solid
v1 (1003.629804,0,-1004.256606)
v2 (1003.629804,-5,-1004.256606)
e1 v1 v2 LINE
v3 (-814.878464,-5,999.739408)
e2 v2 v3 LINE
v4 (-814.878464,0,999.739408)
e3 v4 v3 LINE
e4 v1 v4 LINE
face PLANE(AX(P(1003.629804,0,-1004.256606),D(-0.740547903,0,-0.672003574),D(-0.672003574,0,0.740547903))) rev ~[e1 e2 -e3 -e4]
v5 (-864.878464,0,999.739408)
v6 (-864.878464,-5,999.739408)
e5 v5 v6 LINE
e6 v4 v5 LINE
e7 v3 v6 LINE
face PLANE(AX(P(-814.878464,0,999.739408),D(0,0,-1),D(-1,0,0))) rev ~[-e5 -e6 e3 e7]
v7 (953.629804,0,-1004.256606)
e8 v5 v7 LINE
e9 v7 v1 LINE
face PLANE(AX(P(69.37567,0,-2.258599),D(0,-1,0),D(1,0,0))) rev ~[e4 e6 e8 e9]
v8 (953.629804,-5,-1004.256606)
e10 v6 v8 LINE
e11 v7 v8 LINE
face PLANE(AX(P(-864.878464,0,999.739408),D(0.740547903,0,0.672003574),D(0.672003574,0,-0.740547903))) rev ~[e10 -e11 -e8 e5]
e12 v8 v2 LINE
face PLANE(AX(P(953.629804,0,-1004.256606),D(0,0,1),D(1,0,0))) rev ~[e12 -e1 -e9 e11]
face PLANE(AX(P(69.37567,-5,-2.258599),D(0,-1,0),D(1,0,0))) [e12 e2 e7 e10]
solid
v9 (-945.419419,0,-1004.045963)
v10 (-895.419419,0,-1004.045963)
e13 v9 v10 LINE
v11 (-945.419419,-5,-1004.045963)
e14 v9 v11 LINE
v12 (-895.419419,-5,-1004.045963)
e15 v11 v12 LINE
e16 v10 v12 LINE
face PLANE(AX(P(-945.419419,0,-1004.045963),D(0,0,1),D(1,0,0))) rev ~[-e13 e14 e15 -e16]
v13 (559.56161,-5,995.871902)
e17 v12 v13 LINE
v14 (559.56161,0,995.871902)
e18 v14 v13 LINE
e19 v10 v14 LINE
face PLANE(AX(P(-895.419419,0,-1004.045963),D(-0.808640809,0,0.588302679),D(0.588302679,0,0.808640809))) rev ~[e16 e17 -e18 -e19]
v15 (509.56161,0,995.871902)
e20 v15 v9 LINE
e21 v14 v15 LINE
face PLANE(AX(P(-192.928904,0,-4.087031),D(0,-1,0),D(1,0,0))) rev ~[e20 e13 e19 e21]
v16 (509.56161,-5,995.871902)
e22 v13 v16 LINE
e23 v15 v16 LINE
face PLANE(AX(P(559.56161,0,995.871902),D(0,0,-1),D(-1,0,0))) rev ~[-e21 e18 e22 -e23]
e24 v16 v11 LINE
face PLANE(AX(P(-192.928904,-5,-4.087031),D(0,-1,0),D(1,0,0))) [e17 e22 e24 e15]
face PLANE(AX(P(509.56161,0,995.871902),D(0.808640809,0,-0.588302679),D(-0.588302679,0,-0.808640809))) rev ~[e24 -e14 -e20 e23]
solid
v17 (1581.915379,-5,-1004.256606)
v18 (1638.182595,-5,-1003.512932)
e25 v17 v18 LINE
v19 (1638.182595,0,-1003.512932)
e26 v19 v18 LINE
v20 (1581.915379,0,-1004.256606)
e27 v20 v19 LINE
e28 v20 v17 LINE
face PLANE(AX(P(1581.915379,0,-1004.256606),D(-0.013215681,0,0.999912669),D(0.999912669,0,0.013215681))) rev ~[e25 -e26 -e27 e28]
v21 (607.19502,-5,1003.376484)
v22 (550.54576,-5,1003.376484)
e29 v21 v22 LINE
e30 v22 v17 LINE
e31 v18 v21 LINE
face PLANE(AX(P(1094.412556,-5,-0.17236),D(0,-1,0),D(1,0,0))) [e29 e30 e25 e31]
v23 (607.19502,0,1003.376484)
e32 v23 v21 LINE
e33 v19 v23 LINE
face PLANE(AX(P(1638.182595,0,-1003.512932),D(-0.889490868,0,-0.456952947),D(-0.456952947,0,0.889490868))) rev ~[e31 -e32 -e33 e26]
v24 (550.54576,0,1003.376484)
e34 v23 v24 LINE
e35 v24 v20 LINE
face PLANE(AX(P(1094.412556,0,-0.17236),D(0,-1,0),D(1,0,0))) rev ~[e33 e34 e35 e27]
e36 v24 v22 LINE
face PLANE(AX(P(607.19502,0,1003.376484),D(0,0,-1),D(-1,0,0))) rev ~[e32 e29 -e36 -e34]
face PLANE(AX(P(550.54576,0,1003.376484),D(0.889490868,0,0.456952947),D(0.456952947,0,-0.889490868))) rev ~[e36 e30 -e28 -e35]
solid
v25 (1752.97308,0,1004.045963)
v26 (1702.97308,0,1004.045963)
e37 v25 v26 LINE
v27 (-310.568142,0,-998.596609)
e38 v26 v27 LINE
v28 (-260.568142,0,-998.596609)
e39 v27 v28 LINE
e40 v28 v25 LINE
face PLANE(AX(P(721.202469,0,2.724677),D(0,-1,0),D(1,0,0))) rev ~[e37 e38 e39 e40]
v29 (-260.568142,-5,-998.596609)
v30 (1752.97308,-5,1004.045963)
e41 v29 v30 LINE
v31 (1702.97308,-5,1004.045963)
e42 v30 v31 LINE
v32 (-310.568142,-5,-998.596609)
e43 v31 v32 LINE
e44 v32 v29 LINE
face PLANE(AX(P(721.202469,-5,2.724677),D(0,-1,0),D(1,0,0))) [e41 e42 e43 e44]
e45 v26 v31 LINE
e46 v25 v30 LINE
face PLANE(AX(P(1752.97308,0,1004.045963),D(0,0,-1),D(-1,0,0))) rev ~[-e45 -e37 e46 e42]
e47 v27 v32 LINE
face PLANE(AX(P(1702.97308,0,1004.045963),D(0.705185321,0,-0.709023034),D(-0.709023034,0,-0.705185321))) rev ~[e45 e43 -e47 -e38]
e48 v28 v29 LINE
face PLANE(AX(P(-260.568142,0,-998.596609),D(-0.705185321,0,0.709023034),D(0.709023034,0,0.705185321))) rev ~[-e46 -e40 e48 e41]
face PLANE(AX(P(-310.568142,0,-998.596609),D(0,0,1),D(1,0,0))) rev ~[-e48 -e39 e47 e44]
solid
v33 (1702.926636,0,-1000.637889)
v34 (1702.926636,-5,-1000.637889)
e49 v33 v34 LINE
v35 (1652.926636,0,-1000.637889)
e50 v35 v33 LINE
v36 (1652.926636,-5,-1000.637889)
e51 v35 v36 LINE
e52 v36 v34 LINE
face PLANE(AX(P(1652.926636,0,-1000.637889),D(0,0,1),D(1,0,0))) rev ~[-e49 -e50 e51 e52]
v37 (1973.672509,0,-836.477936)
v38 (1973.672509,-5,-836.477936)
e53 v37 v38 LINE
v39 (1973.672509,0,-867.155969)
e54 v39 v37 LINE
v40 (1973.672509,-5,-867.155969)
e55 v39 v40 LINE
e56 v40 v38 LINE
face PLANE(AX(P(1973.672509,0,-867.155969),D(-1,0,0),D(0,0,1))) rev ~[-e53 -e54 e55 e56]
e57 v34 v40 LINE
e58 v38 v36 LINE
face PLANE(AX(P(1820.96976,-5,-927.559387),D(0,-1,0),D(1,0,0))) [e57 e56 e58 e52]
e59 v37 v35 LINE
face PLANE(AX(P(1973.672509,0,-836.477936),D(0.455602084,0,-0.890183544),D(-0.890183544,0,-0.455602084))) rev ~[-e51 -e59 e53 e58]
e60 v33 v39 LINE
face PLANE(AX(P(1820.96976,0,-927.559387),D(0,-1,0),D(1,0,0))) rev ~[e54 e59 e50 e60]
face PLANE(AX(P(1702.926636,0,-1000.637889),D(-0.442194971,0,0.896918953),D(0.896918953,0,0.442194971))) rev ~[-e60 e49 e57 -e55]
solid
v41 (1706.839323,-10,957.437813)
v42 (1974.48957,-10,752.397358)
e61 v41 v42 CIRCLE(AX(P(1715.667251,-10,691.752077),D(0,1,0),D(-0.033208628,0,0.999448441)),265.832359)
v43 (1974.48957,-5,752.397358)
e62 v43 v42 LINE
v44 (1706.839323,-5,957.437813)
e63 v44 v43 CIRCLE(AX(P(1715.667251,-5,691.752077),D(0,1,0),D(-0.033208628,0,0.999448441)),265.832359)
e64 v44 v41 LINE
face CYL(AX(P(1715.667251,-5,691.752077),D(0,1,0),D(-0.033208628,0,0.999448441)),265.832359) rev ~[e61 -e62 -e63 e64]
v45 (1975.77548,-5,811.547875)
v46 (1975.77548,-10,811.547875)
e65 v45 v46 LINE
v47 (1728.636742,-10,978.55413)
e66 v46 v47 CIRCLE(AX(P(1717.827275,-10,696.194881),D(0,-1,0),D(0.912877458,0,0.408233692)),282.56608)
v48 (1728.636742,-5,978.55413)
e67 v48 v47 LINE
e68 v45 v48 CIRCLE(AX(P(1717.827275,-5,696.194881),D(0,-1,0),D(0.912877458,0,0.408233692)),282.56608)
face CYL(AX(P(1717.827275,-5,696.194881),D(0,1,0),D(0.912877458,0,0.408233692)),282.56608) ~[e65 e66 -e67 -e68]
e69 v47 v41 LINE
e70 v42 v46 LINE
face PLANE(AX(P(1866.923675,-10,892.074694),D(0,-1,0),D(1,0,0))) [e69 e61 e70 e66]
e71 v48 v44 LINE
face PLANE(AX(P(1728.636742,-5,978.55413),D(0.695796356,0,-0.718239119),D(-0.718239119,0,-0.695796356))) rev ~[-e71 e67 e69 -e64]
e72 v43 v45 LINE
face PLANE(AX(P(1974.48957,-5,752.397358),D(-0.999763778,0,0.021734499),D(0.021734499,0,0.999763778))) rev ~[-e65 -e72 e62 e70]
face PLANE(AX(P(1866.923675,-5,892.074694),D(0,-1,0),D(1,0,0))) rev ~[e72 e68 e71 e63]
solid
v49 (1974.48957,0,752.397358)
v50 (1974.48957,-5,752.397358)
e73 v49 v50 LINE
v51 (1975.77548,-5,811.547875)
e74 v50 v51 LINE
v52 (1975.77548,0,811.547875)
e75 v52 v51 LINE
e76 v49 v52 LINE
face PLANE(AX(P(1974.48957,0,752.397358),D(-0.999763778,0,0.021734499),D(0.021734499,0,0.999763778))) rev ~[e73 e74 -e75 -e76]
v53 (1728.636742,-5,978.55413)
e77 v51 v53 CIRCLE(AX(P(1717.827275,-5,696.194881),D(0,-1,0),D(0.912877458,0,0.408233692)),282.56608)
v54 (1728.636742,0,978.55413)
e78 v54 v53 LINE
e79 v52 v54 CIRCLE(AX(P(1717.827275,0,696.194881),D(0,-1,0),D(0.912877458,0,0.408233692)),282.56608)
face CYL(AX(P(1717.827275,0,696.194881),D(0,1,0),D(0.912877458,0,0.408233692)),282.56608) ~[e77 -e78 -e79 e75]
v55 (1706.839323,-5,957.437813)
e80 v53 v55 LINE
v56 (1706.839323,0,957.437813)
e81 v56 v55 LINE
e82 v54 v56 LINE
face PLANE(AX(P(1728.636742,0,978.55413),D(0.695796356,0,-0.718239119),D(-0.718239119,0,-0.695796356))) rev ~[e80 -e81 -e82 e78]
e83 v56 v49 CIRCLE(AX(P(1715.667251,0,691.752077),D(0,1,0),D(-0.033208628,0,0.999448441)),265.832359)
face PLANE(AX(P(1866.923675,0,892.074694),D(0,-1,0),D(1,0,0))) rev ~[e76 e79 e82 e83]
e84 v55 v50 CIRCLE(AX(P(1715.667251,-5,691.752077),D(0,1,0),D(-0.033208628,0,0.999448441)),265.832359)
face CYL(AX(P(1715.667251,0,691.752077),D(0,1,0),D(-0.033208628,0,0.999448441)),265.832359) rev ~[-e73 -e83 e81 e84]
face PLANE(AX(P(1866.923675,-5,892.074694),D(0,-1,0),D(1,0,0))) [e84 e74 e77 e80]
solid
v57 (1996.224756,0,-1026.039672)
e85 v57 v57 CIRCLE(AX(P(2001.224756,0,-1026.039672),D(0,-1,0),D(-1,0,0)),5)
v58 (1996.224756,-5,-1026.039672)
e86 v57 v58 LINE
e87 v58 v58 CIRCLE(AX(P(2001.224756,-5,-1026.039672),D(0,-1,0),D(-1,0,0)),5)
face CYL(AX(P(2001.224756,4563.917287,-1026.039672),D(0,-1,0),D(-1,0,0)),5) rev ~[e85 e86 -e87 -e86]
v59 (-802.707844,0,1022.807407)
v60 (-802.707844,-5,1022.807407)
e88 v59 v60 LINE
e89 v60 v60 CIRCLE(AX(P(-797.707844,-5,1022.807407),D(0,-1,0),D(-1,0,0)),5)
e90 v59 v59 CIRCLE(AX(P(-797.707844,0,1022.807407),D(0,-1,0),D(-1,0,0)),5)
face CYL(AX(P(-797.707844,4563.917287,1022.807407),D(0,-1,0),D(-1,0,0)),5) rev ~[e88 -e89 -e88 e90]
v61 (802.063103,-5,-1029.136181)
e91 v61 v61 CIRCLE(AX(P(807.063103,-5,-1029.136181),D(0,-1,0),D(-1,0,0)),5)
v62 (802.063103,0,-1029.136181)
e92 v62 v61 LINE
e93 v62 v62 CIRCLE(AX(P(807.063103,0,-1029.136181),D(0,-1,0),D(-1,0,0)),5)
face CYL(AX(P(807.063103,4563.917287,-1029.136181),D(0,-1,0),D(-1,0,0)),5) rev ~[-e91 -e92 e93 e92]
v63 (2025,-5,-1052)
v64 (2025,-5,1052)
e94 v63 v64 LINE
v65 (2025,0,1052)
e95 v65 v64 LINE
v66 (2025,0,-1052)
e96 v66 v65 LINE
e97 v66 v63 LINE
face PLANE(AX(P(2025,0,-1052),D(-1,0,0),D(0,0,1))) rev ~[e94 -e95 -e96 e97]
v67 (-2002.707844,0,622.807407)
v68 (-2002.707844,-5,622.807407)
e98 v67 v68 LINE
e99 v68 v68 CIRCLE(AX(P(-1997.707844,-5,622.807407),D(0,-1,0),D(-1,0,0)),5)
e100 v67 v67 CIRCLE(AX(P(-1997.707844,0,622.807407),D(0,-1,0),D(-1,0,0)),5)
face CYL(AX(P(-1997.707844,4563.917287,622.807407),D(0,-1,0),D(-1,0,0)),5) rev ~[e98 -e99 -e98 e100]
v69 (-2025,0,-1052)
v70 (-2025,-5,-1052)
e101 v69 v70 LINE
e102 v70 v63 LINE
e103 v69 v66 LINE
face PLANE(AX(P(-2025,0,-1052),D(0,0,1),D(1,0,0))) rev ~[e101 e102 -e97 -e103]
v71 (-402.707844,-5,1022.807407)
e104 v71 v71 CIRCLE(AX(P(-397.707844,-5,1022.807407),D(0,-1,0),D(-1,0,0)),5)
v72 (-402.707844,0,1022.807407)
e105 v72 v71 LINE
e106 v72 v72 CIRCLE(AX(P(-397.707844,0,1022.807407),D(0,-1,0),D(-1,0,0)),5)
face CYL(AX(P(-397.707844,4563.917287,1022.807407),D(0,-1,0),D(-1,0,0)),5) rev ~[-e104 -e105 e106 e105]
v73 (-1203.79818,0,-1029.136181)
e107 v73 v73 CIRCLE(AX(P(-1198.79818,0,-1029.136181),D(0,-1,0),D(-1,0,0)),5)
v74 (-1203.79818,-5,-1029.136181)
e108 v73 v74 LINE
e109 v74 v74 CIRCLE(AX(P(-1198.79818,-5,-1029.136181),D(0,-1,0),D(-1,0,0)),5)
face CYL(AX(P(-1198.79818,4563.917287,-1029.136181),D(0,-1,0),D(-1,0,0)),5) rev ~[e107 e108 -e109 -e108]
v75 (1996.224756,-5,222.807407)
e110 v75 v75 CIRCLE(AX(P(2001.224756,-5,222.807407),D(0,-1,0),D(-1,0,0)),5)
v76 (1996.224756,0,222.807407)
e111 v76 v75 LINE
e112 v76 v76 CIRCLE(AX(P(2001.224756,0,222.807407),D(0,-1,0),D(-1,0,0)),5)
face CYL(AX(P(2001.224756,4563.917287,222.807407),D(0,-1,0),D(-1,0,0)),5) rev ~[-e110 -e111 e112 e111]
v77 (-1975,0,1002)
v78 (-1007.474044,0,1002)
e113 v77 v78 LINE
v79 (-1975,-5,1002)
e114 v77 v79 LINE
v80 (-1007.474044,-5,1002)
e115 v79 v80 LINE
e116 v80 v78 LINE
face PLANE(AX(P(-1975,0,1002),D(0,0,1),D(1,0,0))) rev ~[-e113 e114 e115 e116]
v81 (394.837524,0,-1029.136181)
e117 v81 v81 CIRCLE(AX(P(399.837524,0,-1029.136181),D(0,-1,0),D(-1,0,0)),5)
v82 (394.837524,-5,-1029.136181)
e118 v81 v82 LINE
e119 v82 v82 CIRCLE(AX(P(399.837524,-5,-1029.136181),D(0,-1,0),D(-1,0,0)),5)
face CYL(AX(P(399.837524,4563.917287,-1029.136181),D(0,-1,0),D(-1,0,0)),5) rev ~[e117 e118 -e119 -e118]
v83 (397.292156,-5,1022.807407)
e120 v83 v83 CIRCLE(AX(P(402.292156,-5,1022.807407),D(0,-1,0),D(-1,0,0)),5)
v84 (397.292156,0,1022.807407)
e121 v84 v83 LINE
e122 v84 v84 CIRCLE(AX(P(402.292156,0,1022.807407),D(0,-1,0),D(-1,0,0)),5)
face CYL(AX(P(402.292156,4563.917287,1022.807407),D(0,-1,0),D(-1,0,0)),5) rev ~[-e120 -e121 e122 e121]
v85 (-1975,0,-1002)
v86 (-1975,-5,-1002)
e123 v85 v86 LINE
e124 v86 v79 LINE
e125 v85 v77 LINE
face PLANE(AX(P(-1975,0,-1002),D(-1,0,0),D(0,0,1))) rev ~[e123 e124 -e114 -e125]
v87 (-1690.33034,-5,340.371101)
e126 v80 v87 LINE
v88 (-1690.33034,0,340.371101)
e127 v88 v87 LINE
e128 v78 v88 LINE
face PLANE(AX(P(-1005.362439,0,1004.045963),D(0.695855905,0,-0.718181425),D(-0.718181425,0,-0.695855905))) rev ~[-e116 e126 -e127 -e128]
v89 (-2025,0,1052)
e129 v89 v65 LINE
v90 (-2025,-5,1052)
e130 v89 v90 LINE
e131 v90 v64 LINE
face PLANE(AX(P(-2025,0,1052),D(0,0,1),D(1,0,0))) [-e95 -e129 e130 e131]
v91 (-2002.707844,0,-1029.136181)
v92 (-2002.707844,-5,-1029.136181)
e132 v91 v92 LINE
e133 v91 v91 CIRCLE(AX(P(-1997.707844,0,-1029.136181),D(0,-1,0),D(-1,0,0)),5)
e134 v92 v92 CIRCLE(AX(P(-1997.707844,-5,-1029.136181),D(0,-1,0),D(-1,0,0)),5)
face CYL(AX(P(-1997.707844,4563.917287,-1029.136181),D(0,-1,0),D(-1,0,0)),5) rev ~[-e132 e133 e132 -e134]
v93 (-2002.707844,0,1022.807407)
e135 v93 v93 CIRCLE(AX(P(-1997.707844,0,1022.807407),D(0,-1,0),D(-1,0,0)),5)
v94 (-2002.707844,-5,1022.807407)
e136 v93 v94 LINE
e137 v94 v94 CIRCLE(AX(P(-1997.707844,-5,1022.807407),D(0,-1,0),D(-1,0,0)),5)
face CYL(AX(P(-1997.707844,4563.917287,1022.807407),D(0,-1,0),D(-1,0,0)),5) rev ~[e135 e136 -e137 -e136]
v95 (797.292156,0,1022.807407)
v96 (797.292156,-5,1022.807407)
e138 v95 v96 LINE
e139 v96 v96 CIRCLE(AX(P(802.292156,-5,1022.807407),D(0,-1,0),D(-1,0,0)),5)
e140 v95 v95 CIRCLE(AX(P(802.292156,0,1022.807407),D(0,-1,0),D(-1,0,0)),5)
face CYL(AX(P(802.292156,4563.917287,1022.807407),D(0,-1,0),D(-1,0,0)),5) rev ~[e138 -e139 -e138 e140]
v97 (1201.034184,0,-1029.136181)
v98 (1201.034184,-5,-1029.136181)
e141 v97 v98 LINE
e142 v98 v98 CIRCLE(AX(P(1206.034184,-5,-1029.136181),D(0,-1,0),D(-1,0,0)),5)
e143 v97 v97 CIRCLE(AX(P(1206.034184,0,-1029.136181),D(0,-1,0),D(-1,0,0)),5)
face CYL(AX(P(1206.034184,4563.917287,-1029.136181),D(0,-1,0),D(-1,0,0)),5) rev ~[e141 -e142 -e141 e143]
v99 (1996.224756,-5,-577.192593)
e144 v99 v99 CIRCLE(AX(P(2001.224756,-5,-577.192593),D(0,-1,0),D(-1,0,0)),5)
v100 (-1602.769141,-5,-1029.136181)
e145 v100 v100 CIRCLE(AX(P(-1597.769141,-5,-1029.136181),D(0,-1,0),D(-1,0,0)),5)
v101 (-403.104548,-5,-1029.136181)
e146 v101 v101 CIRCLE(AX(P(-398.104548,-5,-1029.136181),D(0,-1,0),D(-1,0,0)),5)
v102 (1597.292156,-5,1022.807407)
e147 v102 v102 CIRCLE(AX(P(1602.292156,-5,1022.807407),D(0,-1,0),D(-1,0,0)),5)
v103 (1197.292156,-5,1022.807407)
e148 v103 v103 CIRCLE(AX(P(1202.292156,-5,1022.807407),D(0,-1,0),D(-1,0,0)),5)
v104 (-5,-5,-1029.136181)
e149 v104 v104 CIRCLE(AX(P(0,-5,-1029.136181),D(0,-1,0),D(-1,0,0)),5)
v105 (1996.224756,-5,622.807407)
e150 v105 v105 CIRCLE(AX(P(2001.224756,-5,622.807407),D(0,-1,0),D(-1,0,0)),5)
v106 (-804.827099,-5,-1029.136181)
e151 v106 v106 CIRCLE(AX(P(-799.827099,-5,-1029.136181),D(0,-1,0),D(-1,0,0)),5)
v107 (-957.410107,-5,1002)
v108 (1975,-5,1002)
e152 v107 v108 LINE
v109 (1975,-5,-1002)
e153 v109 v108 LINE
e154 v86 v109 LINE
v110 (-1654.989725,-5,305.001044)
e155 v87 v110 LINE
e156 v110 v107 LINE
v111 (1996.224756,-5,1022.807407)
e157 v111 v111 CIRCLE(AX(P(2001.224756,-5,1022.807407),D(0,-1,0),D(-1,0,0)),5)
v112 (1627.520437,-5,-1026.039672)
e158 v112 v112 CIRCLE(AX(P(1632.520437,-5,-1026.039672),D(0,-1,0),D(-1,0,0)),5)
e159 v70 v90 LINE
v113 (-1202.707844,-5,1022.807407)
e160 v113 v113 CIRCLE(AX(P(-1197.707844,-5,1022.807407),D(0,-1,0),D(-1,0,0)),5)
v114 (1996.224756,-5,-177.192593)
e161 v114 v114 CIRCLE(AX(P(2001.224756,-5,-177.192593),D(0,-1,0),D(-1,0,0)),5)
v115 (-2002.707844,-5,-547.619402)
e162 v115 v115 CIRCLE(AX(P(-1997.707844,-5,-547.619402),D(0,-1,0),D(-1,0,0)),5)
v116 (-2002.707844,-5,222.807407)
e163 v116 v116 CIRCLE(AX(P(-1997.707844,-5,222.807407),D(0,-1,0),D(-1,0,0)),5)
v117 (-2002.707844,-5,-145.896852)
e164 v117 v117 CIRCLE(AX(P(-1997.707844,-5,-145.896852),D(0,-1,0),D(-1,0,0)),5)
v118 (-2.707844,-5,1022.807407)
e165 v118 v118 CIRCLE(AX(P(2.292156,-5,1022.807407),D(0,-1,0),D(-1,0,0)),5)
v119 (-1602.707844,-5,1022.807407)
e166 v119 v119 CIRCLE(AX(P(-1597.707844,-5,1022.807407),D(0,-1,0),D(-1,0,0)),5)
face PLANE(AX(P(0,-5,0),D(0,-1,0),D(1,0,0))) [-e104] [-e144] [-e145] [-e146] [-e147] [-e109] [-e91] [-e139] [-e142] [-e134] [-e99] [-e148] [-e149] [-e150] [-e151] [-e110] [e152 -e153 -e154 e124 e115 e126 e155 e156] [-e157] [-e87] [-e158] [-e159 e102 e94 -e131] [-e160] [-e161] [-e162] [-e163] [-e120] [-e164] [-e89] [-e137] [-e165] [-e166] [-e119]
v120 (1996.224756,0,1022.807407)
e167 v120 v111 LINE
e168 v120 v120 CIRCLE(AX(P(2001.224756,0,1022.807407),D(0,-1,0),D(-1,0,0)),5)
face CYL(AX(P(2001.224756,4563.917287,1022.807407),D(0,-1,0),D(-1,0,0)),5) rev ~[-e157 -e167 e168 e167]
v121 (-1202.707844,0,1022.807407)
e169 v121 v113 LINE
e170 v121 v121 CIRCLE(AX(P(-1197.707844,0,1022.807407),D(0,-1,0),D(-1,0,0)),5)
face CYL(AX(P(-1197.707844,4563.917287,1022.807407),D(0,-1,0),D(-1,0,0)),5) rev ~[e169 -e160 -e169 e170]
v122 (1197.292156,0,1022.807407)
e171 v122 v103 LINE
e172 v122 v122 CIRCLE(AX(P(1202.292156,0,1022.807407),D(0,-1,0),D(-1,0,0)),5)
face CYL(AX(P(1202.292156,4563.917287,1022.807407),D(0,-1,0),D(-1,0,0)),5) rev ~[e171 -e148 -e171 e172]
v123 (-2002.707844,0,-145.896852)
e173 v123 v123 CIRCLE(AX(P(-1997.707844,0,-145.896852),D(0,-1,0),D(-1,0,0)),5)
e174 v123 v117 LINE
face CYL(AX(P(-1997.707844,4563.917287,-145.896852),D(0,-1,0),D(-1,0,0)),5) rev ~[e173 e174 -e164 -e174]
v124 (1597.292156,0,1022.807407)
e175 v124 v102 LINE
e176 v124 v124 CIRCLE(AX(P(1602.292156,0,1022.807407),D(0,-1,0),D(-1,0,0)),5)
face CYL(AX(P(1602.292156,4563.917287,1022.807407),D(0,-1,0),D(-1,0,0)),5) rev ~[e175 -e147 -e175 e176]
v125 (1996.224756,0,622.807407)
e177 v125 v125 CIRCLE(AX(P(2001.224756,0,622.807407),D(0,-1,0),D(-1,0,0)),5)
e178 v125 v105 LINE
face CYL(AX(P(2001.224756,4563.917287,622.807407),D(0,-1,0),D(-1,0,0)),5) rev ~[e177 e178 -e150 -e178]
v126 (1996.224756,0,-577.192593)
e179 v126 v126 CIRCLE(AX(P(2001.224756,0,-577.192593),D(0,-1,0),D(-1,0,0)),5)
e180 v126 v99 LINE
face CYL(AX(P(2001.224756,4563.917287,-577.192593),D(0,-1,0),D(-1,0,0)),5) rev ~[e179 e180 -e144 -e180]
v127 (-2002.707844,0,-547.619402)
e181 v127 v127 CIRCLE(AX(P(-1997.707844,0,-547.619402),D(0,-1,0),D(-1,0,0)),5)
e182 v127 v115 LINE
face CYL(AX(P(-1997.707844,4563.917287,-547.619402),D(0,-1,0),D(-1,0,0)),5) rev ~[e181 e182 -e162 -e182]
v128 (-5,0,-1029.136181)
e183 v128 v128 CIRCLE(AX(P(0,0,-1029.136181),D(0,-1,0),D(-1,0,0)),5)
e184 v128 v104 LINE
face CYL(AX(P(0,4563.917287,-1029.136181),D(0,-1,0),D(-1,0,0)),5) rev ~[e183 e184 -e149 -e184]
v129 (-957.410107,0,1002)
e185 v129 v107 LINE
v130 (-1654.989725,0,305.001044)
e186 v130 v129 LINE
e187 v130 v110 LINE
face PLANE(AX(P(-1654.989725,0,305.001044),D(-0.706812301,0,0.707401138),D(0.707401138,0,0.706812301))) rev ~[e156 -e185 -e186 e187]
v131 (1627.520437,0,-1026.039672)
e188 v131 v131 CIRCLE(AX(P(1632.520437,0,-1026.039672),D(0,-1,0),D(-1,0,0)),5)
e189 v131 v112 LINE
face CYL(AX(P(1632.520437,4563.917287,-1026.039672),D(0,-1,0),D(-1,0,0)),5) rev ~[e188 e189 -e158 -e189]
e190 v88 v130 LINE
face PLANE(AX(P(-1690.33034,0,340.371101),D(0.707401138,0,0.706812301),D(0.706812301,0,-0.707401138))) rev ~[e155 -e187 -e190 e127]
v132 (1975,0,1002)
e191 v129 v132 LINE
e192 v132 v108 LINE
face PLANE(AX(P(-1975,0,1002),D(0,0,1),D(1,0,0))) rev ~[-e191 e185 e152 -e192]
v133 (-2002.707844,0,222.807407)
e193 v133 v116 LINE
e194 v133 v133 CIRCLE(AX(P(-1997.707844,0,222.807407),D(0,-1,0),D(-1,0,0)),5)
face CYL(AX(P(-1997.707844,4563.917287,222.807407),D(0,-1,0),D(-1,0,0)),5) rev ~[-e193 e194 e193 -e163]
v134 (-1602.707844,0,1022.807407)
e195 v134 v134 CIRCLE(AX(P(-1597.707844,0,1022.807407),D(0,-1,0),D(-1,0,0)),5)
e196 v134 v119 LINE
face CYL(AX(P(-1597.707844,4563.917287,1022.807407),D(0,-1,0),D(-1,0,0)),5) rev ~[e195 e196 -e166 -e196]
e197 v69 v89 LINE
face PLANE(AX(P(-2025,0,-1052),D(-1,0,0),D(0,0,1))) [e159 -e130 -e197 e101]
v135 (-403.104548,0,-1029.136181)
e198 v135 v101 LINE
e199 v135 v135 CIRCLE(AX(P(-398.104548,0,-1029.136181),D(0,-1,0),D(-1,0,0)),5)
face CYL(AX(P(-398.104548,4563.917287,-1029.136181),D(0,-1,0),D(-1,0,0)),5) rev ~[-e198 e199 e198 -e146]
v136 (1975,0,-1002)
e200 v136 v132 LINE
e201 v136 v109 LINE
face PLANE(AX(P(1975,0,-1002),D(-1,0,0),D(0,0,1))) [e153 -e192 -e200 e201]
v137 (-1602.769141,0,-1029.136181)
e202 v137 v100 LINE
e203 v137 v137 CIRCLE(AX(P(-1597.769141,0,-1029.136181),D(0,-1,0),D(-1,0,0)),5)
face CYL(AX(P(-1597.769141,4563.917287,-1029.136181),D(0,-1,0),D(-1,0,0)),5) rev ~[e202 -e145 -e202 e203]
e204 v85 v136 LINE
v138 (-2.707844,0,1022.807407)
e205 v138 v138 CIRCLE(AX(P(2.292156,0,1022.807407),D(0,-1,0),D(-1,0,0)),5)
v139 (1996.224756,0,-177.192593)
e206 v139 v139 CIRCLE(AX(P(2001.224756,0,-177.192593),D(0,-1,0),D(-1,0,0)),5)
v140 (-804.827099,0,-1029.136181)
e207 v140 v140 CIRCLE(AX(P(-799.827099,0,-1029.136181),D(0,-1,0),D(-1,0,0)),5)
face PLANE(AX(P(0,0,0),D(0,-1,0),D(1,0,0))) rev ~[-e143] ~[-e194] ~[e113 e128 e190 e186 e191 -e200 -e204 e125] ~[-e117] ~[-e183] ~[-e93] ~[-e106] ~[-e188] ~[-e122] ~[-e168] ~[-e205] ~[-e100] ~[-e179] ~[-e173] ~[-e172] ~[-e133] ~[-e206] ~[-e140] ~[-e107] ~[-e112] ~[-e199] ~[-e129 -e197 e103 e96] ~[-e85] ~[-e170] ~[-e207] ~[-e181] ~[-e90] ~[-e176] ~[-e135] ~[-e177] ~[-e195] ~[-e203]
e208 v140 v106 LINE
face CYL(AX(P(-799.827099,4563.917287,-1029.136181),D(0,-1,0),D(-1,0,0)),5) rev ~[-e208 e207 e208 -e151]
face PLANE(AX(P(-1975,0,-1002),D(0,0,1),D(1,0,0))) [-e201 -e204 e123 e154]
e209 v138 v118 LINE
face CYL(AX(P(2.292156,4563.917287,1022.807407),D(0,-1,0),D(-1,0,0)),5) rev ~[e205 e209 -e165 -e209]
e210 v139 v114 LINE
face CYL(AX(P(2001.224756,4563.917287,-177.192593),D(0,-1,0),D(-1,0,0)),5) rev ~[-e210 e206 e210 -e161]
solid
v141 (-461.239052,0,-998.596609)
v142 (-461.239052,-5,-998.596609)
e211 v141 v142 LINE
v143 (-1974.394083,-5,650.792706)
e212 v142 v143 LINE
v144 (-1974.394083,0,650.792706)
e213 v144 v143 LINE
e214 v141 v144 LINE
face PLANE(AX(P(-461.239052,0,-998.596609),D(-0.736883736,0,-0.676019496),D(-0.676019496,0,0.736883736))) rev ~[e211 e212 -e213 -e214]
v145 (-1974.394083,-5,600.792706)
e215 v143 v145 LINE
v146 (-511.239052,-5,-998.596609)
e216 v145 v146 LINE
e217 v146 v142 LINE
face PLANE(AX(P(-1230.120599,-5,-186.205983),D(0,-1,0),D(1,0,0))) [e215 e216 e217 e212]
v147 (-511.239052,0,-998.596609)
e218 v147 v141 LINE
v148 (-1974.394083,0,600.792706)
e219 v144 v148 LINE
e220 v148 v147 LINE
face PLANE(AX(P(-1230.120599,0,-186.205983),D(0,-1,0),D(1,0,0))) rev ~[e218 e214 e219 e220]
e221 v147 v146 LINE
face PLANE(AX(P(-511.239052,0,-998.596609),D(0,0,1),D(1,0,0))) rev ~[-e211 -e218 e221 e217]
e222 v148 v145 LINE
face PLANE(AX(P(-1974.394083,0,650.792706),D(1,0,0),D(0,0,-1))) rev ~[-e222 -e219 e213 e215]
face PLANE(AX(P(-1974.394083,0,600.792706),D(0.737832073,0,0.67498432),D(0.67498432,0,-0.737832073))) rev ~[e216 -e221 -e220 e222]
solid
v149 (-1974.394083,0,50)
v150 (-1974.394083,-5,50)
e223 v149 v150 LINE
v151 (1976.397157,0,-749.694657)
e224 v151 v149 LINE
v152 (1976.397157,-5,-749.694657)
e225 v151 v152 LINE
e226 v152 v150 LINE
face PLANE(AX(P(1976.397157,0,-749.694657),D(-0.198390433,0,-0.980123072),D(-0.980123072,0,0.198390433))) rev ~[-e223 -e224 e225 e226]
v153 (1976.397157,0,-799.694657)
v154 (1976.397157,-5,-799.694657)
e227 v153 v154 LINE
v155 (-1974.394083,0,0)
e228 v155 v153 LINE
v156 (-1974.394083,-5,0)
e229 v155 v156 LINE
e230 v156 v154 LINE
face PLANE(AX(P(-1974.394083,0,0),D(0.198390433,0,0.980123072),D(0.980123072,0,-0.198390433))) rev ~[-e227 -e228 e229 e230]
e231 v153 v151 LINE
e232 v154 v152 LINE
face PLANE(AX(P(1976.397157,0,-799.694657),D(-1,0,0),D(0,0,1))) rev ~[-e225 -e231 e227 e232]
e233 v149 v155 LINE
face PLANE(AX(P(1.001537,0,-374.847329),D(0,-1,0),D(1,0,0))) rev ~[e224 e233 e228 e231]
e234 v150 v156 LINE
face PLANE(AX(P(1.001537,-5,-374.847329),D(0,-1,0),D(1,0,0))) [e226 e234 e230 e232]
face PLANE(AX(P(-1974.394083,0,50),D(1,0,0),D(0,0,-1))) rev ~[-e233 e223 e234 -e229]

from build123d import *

# Parameters (mm, degrees)
F0_W      = 4050
F0_H      = 2104
F0_W_2    = 3950
F0_H_2    = 2004
F1_DEPTH  = 5
F3_DEPTH  = 5
F5_DEPTH  = 5
F7_DEPTH  = 5
F9_DEPTH  = 5
F11_DEPTH = 5
F13_DEPTH = 5
F15_DEPTH = 5
F17_DEPTH = 5
F19_DEPTH = 5
F21_DEPTH = 5
F23_D     = 10


with BuildPart() as f1:
    # F0 (on Front) → F1 (new body)
    with BuildSketch(Plane.XZ):
        Rectangle(F0_W, F0_H)
        Rectangle(F0_W_2, F0_H_2, mode=Mode.SUBTRACT)
    extrude(amount=F1_DEPTH)

    # F6 (on Front) → F7 (join)
    with BuildSketch(Plane.XZ):
        Polygon((-955.3624391556, 1004.0459632874), (-1005.3624391556, 1004.0459632874), (-1690.3303397292, 340.3711008084), (-1654.98972466, 305.0010438883), align=None)
    extrude(amount=F7_DEPTH)

    # F23 (through all)
    with Locations(Plane(origin=(0, 0, 0), x_dir=(1, 0, 0), z_dir=(0, 1, 0))):
        with Locations((-1997.7078437805, -1022.8074073792), (-1597.7078437805, -1022.8074073792), (-1197.7078437805, -1022.8074073792), (-1997.7078437805, -622.8074073792), (-797.7078437805, -1022.8074073792), (-397.7078437805, -1022.8074073792), (-1997.7078437805, -222.8074073792), (2.2921562195, -1022.8074073792), (402.2921562195, -1022.8074073792), (802.2921562195, -1022.8074073792), (1202.2921562195, -1022.8074073792), (1602.2921562195, -1022.8074073792), (2001.2247562408, -1022.8074073792), (2001.2247562408, -622.8074073792), (2001.2247562408, -222.8074073792), (2001.2247562408, 177.1925926208), (2001.2247562408, 577.1925926208), (2001.2247562408, 1026.0396718979), (1632.5204372406, 1026.0396718979), (1206.0341835022, 1029.1361808777), (807.0631027222, 1029.1361808777), (399.8375236988, 1029.1361808777), (0, 1029.1361808777), (-398.1045484543, 1029.1361808777), (-799.8270988464, 1029.1361808777), (-1198.7981796265, 1029.1361808777), (-1597.7691411972, 1029.1361808777), (-1997.7078437805, 1029.1361808777), (-1997.7078437805, 547.6194024086), (-1997.7078437805, 145.8968520164)):
            Hole(F23_D / 2)


with BuildPart() as f3:
    # F2 (on Front) → F3 (new body)
    with BuildSketch(Plane.XZ):
        Polygon((-1974.3940830231, 50), (-1974.3940830231, 0), (1976.3971567154, -799.6946573257), (1976.3971567154, -749.6946573257), align=None)
    extrude(amount=F3_DEPTH)


with BuildPart() as f5:
    # F4 (on Front) → F5 (new body)
    with BuildSketch(Plane.XZ):
        Polygon((-1974.3940830231, 600.7927060127), (-511.2390518188, -998.5966086388), (-461.2390518188, -998.5966086388), (-1974.3940830231, 650.7927060127), align=None)
    extrude(amount=F5_DEPTH)


with BuildPart() as f9:
    # F8 (on Front) → F9 (new body)
    with BuildSketch(Plane.XZ):
        Polygon((509.5616102219, 995.8719015121), (-945.4194188118, -1004.0459632874), (-895.4194188118, -1004.0459632874), (559.5616102219, 995.8719015121), align=None)
    extrude(amount=F9_DEPTH)


with BuildPart() as f11:
    # F10 (on Front) → F11 (new body)
    with BuildSketch(Plane.XZ):
        Polygon((1702.9730796814, 1004.0459632874), (-310.5681419373, -998.5966086388), (-260.5681419373, -998.5966086388), (1752.9730796814, 1004.0459632874), align=None)
    extrude(amount=F11_DEPTH)


with BuildPart() as f13:
    # F12 (on Front) → F13 (new body)
    with BuildSketch(Plane.XZ):
        Polygon((1652.9266357422, -1000.6378889084), (1702.9266357422, -1000.6378889084), (1973.6725091934, -867.1559691429), (1973.6725091934, -836.4779363076), align=None)
    extrude(amount=F13_DEPTH)


with BuildPart() as f15:
    # F14 (on Front) → F15 (new body)
    with BuildSketch(Plane.XZ):
        Polygon((-864.8784637451, 999.739408493), (953.6298036575, -1004.256606102), (1003.6298036575, -1004.256606102), (-814.8784637451, 999.739408493), align=None)
    extrude(amount=F15_DEPTH)


with BuildPart() as f17:
    # F16 (on Front) → F17 (new body)
    with BuildSketch(Plane.XZ):
        Polygon((550.545759525, 1003.3764839172), (1581.9153785706, -1004.256606102), (1638.1825951839, -1003.512931549), (607.195019722, 1003.3764839172), align=None)
    extrude(amount=F17_DEPTH)


with BuildPart() as f19:
    # F18 (on Front) → F19 (new body)
    with BuildSketch(Plane.XZ):
        with BuildLine():
            Line((1974.489569664, 752.3973584175), (1975.7754802704, 811.5478754044))
            ThreePointArc((1975.7754802704, 811.5478754044), (1876.0374004701, 930.3169562193), (1728.6367416382, 978.5541296005))
            Line((1728.6367416382, 978.5541296005), (1706.8393230438, 957.437813282))
            ThreePointArc((1706.8393230438, 957.437813282), (1877.3295405815, 902.7784897814), (1974.489569664, 752.3973584175))
        make_face()
    extrude(amount=F19_DEPTH)


with BuildPart() as f21:
    # F20 (on face) → F21 (new body)
    with BuildSketch(Plane.XZ.offset(5)):
        with BuildLine():
            Line((1728.6367416382, 978.5541296005), (1706.8393230438, 957.437813282))
            ThreePointArc((1706.8393230438, 957.437813282), (1877.3295405815, 902.7784897814), (1974.489569664, 752.3973584175))
            Line((1974.489569664, 752.3973584175), (1975.7754802704, 811.5478754044))
            ThreePointArc((1975.7754802704, 811.5478754044), (1876.0374004701, 930.3169562193), (1728.6367416382, 978.5541296005))
        make_face()
    extrude(amount=F21_DEPTH)


solid = Compound([f1.part, f3.part, f5.part, f9.part, f11.part, f13.part, f15.part, f17.part, f19.part, f21.part])
